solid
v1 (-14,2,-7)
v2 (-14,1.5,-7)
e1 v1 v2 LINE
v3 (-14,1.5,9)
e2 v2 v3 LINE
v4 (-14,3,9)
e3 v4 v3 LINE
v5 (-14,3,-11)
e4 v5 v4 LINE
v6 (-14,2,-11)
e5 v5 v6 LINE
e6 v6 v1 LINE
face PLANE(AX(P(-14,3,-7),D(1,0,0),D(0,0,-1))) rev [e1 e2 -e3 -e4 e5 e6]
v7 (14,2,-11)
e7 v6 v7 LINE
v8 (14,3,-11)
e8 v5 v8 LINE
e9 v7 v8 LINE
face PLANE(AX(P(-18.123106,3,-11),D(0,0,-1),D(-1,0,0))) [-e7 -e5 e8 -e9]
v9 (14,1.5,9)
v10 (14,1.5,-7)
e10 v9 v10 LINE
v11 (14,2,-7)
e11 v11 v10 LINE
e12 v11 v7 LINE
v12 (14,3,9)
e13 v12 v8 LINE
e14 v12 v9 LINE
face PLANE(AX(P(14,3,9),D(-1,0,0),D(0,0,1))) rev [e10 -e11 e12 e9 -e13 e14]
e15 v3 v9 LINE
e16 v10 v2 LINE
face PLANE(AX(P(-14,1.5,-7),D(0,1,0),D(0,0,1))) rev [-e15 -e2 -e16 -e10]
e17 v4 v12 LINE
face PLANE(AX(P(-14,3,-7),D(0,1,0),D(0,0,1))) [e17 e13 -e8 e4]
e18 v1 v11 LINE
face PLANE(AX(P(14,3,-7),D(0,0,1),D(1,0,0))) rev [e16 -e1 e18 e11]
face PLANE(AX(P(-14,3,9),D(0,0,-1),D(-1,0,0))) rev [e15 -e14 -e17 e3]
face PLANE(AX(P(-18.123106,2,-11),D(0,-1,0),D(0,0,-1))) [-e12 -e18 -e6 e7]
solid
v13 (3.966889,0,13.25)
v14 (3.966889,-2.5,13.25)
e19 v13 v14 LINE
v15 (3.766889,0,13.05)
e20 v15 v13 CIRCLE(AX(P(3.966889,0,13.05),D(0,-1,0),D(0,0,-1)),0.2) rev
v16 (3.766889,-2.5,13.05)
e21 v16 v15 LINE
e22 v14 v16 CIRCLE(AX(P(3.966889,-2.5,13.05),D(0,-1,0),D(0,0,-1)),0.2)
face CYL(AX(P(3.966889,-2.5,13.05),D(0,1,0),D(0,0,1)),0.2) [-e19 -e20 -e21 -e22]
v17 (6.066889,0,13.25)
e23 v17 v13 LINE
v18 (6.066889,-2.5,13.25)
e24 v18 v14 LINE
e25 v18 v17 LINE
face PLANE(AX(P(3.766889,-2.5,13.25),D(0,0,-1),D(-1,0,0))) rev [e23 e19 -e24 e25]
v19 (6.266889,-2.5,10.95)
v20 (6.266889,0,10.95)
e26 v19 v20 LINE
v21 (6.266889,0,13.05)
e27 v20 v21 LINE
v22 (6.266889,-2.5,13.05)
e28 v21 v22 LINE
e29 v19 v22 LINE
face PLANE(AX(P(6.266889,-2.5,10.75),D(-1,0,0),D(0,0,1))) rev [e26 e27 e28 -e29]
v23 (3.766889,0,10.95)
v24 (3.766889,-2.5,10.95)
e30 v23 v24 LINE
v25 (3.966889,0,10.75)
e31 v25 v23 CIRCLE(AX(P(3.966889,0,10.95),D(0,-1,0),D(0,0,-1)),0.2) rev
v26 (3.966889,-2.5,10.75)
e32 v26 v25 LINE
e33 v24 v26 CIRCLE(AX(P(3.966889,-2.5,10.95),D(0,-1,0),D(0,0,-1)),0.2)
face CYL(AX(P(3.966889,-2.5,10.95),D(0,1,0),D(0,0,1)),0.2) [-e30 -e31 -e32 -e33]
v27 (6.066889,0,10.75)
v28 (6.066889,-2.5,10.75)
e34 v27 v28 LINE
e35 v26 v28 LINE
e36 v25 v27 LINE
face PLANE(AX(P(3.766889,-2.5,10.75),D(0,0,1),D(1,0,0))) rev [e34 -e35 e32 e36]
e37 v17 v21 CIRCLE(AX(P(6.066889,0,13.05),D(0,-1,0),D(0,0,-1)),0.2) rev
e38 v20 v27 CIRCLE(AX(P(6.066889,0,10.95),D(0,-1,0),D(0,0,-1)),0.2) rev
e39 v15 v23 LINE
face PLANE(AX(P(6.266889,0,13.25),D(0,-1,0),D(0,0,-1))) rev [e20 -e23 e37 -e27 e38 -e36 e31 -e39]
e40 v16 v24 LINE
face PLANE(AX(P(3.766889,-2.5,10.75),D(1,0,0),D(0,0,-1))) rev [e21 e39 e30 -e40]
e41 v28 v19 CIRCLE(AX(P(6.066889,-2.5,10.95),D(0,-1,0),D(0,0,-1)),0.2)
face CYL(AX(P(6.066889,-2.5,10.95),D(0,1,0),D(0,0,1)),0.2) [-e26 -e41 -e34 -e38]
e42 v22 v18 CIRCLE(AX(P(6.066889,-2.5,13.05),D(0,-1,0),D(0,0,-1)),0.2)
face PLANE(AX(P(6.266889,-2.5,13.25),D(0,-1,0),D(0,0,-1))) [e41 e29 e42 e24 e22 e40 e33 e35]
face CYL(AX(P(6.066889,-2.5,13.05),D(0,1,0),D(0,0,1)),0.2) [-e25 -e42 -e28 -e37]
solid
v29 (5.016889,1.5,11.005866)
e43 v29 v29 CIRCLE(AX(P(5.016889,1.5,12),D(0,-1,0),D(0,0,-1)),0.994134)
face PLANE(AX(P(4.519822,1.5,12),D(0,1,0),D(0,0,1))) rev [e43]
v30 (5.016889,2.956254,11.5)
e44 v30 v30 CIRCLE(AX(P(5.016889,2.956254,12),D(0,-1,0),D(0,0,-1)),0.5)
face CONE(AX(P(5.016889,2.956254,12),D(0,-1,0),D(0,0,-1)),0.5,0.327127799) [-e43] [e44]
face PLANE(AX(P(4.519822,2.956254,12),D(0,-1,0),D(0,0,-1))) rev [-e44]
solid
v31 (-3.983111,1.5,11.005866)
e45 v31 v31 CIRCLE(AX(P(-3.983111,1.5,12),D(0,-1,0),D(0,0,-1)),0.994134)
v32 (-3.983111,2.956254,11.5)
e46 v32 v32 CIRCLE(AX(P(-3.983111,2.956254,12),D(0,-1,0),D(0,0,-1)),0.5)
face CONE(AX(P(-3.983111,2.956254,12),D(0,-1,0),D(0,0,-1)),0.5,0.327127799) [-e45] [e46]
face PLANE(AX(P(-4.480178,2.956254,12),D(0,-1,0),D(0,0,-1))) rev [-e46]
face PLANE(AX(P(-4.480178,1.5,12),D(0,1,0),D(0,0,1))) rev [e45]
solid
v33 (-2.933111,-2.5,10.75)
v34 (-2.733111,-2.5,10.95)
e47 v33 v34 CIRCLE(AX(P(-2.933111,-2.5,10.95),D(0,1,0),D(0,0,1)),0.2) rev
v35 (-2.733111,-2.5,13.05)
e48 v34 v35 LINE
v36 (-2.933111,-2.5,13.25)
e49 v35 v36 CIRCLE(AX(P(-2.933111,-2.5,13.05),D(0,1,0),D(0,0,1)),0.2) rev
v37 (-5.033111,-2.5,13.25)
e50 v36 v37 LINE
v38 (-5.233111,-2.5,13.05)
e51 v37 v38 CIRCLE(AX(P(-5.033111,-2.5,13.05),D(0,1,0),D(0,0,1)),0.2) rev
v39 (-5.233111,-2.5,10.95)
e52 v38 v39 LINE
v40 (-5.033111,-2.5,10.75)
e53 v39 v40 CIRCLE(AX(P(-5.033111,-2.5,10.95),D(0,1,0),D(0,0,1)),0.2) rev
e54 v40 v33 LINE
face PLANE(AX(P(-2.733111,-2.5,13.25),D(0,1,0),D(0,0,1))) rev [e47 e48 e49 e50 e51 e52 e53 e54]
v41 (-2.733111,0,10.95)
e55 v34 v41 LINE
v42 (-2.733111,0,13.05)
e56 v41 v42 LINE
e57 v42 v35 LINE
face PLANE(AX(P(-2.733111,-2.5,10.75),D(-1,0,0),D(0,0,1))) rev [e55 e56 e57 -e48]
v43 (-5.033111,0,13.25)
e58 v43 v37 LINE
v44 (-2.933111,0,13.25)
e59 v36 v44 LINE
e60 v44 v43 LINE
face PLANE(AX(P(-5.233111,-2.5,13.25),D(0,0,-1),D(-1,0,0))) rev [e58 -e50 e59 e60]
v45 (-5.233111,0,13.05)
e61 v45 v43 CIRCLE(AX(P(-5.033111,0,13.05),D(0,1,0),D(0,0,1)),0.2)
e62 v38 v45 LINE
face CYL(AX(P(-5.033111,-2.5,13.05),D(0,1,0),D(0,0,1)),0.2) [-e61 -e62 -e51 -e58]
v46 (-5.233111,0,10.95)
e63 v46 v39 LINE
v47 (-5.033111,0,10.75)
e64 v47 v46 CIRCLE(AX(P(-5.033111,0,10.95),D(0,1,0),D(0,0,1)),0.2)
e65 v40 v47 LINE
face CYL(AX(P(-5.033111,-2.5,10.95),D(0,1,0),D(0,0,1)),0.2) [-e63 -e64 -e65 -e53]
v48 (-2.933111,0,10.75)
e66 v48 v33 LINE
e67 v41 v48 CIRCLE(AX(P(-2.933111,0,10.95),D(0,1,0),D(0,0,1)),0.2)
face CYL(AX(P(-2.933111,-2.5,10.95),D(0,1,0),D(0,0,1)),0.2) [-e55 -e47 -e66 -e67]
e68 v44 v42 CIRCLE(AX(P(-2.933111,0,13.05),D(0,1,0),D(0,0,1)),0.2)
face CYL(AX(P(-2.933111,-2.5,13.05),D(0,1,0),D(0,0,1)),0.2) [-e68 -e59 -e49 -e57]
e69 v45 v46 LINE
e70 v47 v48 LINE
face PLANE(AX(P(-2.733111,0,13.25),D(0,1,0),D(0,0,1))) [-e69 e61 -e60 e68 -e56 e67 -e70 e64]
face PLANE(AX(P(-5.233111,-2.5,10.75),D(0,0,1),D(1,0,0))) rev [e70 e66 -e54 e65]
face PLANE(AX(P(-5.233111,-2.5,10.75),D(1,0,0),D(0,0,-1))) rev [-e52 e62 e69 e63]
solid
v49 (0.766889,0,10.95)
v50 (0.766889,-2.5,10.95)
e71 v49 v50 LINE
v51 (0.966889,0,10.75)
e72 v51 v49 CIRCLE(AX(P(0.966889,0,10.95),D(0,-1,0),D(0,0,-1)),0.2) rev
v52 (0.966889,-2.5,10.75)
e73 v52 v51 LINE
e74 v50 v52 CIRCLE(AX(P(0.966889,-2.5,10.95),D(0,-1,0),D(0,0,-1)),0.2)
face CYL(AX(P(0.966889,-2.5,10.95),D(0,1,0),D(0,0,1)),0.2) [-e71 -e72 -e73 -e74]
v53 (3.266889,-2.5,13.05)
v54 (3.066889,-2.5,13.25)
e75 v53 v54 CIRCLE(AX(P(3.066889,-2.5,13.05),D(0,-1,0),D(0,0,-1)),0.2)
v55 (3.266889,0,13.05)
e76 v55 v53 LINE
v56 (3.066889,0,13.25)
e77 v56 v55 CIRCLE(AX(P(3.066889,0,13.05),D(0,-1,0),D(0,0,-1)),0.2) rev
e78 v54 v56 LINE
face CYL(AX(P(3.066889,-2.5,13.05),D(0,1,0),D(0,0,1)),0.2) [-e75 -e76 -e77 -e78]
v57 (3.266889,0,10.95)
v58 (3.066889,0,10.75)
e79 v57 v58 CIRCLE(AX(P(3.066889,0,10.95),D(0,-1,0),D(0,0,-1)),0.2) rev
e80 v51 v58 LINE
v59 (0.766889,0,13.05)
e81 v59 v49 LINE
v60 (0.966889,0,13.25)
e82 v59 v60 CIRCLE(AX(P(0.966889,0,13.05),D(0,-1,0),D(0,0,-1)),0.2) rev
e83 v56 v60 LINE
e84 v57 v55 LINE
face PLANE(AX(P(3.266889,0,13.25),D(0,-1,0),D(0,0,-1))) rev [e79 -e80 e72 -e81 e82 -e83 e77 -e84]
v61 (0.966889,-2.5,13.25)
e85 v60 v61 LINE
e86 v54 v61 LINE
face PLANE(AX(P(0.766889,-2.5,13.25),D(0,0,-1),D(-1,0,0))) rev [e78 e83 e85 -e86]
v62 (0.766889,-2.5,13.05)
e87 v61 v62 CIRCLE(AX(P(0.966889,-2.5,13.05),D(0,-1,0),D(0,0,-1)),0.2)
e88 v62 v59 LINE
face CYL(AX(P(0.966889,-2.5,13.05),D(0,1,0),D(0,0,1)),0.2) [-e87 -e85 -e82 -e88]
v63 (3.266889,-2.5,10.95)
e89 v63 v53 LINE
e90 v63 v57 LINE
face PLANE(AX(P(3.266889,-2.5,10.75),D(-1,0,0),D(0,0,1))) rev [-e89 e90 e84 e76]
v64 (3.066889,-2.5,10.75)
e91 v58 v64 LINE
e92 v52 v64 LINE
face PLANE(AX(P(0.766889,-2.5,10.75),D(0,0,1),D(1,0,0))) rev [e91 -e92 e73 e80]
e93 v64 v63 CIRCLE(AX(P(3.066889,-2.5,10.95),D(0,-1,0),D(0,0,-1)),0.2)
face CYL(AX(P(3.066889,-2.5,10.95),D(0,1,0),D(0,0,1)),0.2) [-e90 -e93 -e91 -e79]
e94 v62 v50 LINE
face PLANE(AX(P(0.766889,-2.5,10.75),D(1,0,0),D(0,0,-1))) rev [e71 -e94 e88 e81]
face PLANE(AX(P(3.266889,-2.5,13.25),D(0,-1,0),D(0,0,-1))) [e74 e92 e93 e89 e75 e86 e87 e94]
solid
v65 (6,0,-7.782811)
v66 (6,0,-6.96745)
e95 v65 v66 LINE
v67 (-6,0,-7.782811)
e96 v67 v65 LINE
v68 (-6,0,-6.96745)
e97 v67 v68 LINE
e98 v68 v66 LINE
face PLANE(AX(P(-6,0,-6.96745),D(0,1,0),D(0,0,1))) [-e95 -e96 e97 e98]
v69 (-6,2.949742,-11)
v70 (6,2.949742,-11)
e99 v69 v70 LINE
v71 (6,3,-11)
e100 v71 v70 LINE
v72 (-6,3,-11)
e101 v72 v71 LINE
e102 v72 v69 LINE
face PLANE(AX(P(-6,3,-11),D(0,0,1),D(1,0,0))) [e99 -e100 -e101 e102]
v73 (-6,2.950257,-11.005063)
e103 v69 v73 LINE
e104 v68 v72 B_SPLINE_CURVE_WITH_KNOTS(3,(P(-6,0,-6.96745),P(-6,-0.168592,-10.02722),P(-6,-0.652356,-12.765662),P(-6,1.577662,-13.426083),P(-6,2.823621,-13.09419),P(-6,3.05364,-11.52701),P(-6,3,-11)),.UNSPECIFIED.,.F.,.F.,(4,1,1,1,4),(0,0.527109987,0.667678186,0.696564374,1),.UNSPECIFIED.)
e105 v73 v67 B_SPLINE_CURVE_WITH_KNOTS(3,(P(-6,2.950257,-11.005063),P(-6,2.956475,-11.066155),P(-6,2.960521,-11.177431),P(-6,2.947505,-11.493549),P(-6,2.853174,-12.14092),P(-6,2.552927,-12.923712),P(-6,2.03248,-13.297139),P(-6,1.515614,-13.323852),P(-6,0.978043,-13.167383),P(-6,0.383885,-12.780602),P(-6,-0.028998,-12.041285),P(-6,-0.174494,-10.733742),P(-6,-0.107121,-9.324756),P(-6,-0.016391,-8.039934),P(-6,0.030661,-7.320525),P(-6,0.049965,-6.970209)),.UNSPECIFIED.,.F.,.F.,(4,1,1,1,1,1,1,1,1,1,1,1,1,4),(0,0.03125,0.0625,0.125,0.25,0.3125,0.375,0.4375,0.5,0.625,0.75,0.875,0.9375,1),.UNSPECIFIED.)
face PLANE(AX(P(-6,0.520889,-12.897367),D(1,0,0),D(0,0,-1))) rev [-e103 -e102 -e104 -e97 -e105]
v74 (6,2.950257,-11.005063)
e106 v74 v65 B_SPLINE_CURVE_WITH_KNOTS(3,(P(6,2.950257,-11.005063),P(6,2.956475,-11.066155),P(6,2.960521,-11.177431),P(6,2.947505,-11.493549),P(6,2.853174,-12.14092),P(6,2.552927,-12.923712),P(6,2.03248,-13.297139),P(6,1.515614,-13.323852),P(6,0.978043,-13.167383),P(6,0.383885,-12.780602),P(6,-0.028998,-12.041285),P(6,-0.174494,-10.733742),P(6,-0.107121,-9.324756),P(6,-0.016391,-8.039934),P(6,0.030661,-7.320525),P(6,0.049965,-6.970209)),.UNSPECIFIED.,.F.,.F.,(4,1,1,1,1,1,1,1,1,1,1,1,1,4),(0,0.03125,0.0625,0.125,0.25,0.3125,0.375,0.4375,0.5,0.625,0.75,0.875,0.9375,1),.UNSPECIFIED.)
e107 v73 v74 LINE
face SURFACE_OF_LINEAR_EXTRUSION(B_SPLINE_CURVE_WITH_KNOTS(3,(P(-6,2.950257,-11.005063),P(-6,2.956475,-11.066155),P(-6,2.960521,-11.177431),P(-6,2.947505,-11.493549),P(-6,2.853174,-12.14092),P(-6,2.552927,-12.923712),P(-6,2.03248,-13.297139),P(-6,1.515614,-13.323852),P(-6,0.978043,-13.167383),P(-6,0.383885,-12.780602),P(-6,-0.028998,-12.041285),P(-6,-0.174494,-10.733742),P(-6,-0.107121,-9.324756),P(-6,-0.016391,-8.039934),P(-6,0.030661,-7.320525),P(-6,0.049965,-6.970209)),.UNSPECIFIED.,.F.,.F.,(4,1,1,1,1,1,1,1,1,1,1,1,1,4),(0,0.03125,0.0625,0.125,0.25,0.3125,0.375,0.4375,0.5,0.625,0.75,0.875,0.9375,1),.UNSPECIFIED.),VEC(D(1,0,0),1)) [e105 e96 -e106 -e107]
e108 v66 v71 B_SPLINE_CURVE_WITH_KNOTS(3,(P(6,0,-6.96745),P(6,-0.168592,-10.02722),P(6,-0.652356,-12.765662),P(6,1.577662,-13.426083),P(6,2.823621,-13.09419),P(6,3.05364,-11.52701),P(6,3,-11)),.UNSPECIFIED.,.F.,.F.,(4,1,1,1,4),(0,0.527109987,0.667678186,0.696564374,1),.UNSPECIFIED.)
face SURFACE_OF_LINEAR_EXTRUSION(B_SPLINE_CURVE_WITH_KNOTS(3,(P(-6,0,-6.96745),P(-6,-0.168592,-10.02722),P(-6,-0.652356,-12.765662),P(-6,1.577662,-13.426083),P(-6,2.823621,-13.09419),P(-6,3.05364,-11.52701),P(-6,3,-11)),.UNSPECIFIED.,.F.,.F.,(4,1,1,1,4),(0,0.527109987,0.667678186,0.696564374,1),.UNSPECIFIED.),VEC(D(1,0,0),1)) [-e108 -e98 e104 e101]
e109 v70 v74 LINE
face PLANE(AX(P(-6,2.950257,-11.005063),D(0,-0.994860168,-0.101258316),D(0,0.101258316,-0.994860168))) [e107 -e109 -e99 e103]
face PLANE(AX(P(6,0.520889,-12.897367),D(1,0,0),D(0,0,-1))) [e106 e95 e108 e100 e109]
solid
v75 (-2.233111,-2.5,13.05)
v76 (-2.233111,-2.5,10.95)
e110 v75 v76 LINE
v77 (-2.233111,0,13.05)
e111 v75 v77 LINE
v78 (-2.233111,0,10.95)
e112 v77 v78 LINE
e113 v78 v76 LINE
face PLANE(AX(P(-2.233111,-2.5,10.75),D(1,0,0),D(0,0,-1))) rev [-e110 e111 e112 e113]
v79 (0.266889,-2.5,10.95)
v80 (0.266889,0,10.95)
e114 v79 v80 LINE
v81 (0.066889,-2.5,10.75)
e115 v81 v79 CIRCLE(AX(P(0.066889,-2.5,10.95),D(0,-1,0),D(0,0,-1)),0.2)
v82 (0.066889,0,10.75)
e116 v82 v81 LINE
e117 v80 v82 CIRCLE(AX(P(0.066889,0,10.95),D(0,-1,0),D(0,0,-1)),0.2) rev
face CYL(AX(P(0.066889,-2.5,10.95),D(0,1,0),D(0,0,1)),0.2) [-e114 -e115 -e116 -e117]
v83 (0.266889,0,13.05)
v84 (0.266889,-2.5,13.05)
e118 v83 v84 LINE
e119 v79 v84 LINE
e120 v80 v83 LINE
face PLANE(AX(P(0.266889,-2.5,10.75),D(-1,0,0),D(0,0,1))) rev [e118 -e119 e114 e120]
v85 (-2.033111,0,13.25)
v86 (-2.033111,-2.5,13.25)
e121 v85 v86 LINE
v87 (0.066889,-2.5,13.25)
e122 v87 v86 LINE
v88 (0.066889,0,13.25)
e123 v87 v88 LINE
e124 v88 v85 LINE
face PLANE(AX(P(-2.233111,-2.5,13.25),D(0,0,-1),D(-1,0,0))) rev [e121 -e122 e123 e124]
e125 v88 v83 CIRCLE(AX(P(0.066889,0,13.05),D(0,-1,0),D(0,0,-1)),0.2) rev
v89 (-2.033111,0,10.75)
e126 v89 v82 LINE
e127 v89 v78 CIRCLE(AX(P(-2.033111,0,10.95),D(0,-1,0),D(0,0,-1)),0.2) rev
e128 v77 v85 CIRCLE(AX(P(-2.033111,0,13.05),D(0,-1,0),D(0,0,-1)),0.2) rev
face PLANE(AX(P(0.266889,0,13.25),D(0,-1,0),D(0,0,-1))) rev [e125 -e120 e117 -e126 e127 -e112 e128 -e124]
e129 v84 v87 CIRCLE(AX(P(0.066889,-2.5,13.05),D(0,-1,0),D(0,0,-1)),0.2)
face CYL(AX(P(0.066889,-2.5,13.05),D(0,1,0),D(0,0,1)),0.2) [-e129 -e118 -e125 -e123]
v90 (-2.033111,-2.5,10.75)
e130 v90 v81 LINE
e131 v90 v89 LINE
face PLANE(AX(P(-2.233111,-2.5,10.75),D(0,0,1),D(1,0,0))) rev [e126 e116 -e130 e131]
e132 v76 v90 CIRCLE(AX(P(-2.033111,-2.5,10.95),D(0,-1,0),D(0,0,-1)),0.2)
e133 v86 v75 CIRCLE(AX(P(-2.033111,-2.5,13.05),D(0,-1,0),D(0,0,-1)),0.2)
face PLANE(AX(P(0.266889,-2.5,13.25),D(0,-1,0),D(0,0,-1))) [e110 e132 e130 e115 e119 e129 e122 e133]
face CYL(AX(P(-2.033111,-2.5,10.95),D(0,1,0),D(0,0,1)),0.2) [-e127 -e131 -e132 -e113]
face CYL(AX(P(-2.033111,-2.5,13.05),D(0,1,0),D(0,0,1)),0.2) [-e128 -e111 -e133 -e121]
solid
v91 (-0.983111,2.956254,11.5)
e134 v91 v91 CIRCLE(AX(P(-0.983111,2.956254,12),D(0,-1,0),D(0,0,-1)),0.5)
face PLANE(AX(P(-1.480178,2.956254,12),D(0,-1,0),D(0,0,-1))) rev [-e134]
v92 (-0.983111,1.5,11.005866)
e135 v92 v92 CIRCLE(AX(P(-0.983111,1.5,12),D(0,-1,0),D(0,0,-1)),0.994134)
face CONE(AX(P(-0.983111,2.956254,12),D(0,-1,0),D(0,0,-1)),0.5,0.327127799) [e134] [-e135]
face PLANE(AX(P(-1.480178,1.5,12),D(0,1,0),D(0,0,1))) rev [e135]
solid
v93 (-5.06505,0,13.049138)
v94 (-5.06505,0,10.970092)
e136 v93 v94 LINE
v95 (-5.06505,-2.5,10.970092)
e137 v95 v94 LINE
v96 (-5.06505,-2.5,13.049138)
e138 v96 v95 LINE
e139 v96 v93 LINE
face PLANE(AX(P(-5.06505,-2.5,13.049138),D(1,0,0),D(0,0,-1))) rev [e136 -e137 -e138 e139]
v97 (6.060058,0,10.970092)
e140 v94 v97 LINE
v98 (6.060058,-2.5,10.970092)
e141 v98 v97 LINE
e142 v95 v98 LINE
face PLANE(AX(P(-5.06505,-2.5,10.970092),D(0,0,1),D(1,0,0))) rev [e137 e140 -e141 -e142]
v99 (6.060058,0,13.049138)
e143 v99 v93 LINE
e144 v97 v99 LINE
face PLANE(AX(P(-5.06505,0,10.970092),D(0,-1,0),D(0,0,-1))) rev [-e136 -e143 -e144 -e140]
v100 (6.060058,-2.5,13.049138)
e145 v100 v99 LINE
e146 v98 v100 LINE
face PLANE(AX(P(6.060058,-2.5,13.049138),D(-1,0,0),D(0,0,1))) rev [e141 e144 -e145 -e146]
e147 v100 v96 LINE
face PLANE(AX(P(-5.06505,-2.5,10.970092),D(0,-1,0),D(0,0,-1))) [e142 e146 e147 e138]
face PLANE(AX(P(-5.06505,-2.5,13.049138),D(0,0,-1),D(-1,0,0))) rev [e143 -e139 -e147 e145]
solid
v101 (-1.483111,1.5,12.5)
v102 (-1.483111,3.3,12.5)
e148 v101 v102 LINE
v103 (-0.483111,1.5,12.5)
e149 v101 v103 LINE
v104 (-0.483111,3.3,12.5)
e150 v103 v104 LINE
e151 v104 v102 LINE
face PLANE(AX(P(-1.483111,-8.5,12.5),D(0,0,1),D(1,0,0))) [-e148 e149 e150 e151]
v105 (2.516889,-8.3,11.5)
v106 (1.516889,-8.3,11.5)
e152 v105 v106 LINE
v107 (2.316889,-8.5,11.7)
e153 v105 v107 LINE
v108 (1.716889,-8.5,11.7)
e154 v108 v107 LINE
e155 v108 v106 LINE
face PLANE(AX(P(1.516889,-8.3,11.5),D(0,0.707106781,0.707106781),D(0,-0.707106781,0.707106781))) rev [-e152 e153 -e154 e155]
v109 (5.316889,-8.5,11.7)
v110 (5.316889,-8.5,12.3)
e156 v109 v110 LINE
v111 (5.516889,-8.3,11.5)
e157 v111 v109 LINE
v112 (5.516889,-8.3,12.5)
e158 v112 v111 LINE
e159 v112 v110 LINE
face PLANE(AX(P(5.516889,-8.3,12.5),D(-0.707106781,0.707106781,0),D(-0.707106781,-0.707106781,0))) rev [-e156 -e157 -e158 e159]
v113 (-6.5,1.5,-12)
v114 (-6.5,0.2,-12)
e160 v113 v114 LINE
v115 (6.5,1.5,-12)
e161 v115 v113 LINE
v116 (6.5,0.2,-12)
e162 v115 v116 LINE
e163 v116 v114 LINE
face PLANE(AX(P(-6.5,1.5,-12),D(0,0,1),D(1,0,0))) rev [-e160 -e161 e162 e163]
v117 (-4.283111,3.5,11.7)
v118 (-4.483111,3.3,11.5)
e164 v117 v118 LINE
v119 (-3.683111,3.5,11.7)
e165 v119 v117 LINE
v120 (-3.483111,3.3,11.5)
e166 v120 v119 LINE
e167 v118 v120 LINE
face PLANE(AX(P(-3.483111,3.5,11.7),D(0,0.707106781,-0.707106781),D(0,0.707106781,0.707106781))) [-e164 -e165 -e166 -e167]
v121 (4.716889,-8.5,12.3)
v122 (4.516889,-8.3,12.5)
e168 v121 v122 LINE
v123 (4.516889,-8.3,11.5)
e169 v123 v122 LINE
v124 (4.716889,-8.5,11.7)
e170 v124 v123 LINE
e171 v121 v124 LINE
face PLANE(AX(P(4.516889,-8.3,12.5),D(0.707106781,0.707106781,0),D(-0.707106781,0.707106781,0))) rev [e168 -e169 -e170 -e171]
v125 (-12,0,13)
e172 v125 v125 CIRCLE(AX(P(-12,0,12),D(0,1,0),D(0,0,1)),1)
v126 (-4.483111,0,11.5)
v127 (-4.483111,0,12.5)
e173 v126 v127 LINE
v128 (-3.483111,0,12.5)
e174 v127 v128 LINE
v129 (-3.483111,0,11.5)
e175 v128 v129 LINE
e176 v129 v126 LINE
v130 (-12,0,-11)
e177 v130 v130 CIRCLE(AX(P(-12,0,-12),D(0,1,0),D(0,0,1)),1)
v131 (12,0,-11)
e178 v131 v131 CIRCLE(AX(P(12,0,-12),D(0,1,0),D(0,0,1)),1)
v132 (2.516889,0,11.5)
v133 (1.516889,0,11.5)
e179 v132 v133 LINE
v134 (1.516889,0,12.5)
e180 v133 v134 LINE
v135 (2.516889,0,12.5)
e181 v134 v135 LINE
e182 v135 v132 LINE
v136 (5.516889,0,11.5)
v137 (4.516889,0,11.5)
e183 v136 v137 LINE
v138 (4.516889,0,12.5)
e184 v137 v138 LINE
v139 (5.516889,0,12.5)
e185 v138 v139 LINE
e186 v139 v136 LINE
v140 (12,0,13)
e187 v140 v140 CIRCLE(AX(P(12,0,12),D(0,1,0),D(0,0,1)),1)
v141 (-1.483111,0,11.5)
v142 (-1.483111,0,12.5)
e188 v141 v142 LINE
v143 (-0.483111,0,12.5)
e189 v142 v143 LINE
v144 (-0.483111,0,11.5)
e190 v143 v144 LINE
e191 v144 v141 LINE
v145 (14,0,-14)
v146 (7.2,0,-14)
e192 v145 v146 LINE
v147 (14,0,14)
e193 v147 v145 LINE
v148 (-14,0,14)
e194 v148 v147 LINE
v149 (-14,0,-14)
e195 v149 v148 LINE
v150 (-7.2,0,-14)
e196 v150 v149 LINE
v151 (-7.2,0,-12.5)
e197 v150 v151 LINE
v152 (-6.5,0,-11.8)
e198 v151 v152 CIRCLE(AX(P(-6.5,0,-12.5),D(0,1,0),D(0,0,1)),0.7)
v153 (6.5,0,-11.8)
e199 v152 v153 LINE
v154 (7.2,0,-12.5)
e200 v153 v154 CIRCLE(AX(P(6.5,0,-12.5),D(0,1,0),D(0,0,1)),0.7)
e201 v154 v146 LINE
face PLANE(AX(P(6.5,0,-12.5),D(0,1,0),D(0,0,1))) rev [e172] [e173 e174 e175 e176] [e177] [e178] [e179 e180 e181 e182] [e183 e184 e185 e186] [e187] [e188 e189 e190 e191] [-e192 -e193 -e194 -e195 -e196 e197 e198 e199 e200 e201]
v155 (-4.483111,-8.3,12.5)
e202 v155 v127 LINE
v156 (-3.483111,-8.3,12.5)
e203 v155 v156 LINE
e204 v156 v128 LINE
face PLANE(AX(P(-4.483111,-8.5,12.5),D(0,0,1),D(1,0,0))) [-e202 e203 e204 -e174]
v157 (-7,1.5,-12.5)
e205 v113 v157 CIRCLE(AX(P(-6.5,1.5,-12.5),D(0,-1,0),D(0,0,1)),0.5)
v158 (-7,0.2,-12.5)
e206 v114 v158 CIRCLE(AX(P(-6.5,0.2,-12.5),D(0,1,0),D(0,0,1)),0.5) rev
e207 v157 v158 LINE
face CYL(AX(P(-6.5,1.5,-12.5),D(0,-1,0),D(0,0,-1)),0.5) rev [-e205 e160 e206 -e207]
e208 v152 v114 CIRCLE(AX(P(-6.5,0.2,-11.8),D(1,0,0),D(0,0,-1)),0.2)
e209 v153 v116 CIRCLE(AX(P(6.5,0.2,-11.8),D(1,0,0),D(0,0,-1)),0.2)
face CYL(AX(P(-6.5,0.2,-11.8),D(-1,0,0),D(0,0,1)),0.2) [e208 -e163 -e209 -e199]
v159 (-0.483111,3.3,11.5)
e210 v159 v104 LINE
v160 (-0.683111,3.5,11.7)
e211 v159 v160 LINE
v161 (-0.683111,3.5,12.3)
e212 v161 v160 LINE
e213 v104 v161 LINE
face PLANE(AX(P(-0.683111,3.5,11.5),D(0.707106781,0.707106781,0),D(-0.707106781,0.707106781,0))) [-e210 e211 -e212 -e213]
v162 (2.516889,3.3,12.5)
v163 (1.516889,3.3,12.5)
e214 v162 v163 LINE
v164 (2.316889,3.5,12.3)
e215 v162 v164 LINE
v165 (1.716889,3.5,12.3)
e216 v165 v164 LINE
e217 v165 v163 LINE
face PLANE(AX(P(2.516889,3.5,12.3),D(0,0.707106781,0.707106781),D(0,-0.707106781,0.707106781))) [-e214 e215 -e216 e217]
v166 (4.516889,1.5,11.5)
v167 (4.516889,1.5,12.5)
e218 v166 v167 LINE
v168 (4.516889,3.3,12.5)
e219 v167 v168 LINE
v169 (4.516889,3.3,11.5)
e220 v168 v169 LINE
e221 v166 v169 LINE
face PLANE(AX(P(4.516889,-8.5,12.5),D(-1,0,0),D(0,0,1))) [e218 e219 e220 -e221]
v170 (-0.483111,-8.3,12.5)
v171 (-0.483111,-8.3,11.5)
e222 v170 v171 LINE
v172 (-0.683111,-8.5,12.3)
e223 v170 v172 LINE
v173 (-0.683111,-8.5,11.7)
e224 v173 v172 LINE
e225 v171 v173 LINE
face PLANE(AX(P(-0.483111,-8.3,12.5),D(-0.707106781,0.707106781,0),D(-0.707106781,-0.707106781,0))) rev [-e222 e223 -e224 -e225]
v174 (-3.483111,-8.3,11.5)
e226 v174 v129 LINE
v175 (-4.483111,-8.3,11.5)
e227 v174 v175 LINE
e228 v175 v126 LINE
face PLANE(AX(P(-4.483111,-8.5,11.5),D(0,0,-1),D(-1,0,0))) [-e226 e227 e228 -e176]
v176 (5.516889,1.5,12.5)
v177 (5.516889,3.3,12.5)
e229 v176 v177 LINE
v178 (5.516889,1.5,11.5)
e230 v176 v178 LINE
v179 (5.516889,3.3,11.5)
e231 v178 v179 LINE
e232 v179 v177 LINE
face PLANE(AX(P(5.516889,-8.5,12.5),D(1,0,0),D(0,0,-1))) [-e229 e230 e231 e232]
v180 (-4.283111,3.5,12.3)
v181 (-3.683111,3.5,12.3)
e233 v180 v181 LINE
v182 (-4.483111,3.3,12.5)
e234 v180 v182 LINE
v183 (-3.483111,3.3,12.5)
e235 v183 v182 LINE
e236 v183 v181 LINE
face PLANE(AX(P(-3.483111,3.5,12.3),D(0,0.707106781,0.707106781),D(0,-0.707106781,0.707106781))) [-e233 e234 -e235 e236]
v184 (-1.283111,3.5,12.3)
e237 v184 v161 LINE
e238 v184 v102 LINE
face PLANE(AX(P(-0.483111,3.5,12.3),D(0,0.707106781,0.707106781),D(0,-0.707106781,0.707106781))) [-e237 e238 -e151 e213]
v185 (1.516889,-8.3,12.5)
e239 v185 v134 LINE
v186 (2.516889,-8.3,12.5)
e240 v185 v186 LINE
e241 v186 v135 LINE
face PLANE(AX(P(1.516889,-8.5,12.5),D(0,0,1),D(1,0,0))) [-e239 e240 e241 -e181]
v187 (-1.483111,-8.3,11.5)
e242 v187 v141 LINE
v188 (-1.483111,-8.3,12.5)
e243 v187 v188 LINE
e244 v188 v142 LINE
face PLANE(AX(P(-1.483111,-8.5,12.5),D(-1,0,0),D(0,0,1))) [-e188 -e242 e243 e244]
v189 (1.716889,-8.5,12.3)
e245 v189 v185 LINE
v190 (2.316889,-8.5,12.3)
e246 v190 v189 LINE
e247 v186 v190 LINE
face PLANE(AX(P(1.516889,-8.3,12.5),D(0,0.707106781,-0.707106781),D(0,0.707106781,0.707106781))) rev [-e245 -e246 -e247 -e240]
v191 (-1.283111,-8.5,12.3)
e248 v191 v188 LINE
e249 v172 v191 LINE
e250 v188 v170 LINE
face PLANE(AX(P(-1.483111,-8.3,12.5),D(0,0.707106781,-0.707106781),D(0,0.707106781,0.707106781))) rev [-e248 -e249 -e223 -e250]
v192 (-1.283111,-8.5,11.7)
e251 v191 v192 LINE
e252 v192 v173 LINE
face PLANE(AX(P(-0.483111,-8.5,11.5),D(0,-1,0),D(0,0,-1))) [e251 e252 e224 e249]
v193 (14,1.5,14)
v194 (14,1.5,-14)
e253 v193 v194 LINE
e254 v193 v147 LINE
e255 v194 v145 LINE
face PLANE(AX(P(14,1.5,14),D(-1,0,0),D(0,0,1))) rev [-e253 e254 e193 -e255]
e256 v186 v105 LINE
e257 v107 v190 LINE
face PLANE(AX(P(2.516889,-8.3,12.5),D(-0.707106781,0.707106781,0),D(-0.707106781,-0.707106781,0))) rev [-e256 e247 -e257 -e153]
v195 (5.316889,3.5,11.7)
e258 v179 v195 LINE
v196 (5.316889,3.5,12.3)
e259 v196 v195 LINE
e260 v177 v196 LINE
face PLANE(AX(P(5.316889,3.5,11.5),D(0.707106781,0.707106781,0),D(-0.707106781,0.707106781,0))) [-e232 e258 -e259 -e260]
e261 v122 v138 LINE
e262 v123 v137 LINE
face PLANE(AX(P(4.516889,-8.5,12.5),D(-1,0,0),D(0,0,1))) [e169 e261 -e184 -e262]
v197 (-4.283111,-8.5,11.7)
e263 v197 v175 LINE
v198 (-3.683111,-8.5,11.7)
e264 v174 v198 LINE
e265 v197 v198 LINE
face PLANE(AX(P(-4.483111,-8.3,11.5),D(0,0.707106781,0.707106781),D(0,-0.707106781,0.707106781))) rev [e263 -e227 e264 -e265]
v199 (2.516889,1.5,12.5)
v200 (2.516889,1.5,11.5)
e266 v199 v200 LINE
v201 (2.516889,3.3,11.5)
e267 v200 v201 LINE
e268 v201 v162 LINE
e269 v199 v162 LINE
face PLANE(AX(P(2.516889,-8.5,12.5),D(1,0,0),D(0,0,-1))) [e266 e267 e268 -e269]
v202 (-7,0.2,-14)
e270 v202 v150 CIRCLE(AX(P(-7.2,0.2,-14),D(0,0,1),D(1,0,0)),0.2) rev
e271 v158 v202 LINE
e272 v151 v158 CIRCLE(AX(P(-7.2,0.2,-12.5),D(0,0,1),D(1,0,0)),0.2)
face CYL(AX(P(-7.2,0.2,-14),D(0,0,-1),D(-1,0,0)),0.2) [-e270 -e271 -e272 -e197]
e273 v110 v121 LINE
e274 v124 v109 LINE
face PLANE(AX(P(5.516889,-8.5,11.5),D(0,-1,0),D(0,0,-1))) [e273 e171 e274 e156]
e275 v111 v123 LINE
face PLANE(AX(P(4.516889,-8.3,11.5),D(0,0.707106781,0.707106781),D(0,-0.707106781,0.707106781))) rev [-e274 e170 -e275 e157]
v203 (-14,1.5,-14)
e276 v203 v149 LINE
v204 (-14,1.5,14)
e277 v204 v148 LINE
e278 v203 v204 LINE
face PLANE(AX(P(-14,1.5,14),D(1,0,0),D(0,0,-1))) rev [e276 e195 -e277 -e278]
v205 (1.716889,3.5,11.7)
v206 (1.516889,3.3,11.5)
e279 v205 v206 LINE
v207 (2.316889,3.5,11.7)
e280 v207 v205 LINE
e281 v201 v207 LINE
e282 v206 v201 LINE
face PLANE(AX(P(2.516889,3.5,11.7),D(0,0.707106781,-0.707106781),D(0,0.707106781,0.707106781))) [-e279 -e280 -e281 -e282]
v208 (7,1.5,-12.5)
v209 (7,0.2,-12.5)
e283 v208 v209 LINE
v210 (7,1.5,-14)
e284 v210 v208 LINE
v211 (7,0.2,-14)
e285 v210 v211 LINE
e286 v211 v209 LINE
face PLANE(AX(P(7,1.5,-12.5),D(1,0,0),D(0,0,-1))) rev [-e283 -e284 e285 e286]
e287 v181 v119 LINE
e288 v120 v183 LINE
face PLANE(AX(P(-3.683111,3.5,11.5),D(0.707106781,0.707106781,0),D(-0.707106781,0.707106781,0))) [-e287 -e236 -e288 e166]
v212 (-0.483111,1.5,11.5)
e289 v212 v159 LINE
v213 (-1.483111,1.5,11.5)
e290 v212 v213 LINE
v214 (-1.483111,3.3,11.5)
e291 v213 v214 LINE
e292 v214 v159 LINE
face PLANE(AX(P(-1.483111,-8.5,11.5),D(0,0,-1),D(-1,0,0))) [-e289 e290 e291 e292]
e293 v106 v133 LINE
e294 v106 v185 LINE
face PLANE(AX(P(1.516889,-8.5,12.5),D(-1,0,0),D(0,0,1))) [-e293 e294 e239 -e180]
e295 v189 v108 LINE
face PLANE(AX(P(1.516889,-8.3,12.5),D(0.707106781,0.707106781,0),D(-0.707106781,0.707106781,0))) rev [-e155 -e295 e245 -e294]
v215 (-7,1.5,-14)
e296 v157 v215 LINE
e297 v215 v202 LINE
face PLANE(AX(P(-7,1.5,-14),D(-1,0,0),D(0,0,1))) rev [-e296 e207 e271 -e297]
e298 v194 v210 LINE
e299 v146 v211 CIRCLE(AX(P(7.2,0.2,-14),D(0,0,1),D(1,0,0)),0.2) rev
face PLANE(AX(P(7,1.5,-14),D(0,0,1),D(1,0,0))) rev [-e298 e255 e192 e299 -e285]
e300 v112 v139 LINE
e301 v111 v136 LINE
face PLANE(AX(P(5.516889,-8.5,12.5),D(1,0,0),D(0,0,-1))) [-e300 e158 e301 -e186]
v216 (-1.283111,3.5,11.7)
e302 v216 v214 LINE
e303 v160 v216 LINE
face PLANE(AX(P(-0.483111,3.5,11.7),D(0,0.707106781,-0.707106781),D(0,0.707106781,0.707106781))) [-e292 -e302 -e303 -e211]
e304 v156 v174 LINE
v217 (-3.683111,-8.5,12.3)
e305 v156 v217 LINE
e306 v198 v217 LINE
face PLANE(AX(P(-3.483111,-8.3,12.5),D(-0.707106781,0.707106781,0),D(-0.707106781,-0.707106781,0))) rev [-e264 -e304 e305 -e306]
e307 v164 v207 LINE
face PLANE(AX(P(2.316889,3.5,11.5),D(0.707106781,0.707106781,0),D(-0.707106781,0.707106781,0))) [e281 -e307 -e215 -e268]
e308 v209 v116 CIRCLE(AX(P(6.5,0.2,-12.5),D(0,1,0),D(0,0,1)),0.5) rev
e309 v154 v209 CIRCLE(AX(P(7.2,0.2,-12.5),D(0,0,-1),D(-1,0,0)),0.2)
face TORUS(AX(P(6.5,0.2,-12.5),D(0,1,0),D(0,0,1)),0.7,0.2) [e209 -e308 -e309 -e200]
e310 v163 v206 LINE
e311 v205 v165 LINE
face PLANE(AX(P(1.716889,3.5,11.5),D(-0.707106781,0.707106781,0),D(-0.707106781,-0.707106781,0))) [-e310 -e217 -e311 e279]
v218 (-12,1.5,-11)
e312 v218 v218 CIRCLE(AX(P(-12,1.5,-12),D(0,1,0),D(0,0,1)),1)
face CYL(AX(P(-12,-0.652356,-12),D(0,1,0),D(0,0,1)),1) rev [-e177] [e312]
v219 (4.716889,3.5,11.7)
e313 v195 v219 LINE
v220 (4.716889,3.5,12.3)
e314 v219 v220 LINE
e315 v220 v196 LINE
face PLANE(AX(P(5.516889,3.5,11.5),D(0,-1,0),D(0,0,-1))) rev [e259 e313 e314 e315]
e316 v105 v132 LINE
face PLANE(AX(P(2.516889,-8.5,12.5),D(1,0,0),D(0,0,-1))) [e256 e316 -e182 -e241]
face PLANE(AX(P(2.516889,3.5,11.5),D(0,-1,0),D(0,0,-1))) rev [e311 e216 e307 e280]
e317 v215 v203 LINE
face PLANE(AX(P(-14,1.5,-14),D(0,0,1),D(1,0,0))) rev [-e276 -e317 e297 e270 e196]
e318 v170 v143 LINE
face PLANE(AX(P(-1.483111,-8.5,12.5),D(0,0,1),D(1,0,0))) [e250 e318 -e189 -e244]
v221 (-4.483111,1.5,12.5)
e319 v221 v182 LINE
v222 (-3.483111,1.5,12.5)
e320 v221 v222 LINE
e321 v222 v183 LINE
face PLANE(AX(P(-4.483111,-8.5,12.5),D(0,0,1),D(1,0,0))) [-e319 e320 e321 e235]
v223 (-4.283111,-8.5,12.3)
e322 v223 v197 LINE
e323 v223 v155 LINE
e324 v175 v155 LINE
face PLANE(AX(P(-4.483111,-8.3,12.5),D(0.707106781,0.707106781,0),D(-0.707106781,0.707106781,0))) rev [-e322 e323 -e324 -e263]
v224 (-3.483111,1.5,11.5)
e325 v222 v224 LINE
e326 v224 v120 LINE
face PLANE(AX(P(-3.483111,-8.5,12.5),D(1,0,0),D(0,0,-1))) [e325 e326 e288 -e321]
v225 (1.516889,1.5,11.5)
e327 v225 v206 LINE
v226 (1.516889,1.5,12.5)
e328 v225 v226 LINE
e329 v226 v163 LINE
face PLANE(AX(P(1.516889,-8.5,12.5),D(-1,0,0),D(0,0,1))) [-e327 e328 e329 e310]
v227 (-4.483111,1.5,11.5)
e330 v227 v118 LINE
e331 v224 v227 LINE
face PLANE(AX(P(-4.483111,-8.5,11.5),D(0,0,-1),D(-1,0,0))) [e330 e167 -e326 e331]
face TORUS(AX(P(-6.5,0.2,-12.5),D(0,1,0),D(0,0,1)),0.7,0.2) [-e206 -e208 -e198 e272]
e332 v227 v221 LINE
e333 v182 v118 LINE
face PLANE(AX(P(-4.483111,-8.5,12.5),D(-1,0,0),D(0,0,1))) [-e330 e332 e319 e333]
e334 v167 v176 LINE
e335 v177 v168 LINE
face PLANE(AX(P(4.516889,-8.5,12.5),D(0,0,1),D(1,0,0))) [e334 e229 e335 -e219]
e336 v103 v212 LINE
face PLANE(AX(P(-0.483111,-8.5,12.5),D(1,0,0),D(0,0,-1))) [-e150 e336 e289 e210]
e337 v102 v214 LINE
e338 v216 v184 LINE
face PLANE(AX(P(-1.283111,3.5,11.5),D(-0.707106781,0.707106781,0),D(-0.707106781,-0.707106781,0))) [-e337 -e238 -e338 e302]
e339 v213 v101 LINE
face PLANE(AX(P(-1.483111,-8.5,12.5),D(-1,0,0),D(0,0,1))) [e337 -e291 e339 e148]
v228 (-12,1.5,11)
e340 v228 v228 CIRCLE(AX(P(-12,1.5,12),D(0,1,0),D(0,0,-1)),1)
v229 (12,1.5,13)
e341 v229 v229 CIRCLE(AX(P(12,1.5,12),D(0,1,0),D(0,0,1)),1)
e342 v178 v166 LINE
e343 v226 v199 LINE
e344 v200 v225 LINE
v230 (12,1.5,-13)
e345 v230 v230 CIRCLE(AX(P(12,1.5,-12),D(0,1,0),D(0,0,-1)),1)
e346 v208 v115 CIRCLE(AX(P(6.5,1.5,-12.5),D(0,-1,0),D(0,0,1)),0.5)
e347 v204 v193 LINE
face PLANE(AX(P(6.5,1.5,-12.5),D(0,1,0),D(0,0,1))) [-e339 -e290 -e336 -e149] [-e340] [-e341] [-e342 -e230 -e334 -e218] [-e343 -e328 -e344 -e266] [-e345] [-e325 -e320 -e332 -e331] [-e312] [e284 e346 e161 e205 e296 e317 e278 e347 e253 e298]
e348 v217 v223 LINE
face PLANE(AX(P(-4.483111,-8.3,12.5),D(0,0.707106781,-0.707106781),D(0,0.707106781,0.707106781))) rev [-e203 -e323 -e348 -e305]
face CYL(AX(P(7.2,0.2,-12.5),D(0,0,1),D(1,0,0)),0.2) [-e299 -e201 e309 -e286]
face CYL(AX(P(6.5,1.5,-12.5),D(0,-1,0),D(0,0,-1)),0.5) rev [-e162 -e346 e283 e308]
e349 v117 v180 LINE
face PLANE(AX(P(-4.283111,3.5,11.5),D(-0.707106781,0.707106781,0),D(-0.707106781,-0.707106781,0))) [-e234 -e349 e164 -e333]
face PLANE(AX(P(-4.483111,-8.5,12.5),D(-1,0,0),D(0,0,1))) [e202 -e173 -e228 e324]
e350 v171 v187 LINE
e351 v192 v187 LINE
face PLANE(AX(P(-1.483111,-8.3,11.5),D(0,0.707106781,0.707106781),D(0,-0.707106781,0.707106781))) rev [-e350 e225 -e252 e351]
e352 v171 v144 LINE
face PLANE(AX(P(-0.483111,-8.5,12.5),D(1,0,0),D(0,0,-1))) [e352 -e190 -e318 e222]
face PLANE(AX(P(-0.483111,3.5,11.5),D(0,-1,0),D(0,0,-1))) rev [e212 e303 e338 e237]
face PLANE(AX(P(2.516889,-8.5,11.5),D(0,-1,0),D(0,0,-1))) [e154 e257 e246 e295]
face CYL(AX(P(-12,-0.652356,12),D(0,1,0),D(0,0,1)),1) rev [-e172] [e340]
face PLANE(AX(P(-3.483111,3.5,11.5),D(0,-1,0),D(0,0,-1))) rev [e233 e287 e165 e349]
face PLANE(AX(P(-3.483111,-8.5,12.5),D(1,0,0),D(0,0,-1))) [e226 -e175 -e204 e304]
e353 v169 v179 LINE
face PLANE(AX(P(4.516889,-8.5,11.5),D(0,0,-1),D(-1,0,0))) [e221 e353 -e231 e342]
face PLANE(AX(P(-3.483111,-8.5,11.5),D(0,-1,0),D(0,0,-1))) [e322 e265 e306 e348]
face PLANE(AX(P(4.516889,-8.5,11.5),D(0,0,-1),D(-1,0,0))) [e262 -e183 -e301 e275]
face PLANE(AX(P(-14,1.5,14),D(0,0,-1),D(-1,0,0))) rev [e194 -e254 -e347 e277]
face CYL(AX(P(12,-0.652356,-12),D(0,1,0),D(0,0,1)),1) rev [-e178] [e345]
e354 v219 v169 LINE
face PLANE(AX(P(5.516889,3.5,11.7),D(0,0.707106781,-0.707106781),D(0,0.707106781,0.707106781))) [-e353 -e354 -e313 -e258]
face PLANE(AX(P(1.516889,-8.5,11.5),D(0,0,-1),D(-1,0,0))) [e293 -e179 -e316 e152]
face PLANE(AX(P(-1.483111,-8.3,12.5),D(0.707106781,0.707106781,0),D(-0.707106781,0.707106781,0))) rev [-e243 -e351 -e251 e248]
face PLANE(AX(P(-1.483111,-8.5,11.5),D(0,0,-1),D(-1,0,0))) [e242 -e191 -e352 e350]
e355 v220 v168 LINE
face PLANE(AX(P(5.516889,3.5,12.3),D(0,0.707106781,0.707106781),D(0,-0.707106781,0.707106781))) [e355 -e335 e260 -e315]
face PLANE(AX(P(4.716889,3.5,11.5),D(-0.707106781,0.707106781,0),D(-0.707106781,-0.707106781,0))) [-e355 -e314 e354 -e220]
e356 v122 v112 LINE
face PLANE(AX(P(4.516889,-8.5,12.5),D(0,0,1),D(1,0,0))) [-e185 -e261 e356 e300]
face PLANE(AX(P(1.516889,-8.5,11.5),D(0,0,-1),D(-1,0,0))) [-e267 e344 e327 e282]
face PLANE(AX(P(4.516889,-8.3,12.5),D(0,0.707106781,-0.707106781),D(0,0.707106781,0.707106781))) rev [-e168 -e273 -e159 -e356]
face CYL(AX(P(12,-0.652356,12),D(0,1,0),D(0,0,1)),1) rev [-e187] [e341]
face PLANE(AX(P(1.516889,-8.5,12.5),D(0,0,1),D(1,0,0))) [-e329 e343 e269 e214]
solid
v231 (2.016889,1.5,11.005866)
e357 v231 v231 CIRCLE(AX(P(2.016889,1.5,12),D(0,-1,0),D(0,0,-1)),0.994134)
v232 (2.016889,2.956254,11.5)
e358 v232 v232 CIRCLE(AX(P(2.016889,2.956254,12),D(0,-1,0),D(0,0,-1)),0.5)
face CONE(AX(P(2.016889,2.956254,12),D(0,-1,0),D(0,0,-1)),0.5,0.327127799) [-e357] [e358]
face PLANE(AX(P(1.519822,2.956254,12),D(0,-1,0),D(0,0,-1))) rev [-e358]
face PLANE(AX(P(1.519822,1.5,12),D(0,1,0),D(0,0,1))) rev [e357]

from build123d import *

# Parameters (mm, degrees)
BOSS_EXTRUDE1_DEPTH      = 1.5
SKETCH2_W                = 28
SKETCH2_H                = 16
BOSS_EXTRUDE2_DEPTH      = 1.5
SKETCH3_W                = 4
SKETCH3_H                = 1
BOSS_EXTRUDE3_DEPTH      = 28
BOSS_EXTRUDE4_START      = -20
BOSS_EXTRUDE4_DEPTH      = 12
FILLET1_R                = 0.2
SKETCH5_R                = 1
CUT_EXTRUDE1_DEPTH       = 20.870909964
BOSS_EXTRUDE5_DEPTH      = 2
BOSS_EXTRUDE5_DEPTH_BACK = 10
SKETCH6_W                = 1
SKETCH6_H                = 1
SKETCH7_W                = 2.5
SKETCH7_H                = 2.5
BOSS_EXTRUDE6_DEPTH      = 2.5
BOSS_EXTRUDE6_2_DEPTH    = 2.5
BOSS_EXTRUDE6_3_DEPTH    = 2.5
BOSS_EXTRUDE6_4_DEPTH    = 2.5
SKETCH8_W                = 11.125107546
SKETCH8_H                = 2.079045943
BOSS_EXTRUDE7_DEPTH      = 2.5
FILLET2_R                = 0.2
FILLET3_R                = 0.2
FILLET4_R                = 0.2
FILLET5_R                = 0.2
CHAMFER1_SIZE            = 0.2
LPATTERN2_COUNT          = 4
LPATTERN2_PITCH          = 3


# Read off the part's stored shape, not the designer's step: Boss-Extrude4
with BuildPart() as part:
    # Sketch1 → Boss-Extrude1 (new body)
    with BuildSketch(Plane(origin=(0, 0, 0), x_dir=(1, 0, 0), z_dir=(0, 1, 0))):
        with BuildLine():
            Line((7, 14), (14, 14))
            Line((14, 14), (14, -14))
            Line((14, -14), (-14, -14))
            Line((-14, -14), (-14, 14))
            Line((-14, 14), (-7, 14))
            Line((-7, 14), (-7, 12.5))
            ThreePointArc((-7, 12.5), (-6.853553391, 12.146446609), (-6.5, 12))
            Line((-6.5, 12), (6.5, 12))
            ThreePointArc((6.5, 12), (6.853553391, 12.146446609), (7, 12.5))
            Line((7, 12.5), (7, 14))
        make_face()
    extrude(amount=BOSS_EXTRUDE1_DEPTH)

    # Fillet1
    fillet1_edges = [part.edges().sort_by_distance(p)[0] for p in [
        (-7, 0, -13.25),
        (-6.853553391, 0, -12.146446609),
        (0, 0, -12),
        (6.853553391, 0, -12.146446609),
        (7, 0, -13.25),
    ]]
    fillet(fillet1_edges, radius=FILLET1_R)

    # Sketch5 → Cut-Extrude1 (cut, through all)
    with BuildSketch(Plane(origin=(0, 1.5, 0), x_dir=(1, 0, 0), z_dir=(0, 1, 0))):
        with Locations(Location((-12, 12, 0), (0, 0, 270))):
            Circle(SKETCH5_R)
        with Locations(Location((-12, -12, 0), (0, 0, 270))):
            Circle(SKETCH5_R)
        with Locations(Location((12, -12, 0), (0, 0, 270))):
            Circle(SKETCH5_R)
        with Locations(Location((12, 12, 0), (0, 0, 270))):
            Circle(SKETCH5_R)
    extrude(amount=-CUT_EXTRUDE1_DEPTH, mode=Mode.SUBTRACT)

    # Sketch6 → Boss-Extrude5 (add, two sides: drawn at the far end of the back side and taken through both)
    with BuildSketch(Plane(origin=(0, 1.5, 0), x_dir=(1, 0, 0), z_dir=(0, 1, 0)).offset(-BOSS_EXTRUDE5_DEPTH_BACK)):
        with Locations((-3.983110737, -12)):
            Rectangle(SKETCH6_W, SKETCH6_H)
        with Locations((2.016889263, -12)):
            Rectangle(SKETCH6_W, SKETCH6_H)
        with Locations((-0.983110737, -12)):
            Rectangle(SKETCH6_W, SKETCH6_H)
        with Locations((5.016889263, -12)):
            Rectangle(SKETCH6_W, SKETCH6_H)
    extrude(amount=BOSS_EXTRUDE5_DEPTH + BOSS_EXTRUDE5_DEPTH_BACK)

    # Chamfer1
    chamfer1_edges = [part.edges().sort_by_distance(p)[0] for p in [
        (-3.483110737, -8.5, 12),
        (-3.983110737, -8.5, 12.5),
        (-4.483110737, -8.5, 12),
        (-3.983110737, -8.5, 11.5),
        (-3.483110737, 3.5, 12),
        (-3.983110737, 3.5, 11.5),
        (-4.483110737, 3.5, 12),
        (-3.983110737, 3.5, 12.5),
        (2.516889263, -8.5, 12),
        (2.016889263, -8.5, 12.5),
        (1.516889263, -8.5, 12),
        (2.016889263, -8.5, 11.5),
        (2.516889263, 3.5, 12),
        (2.016889263, 3.5, 11.5),
        (1.516889263, 3.5, 12),
        (2.016889263, 3.5, 12.5),
        (-0.483110737, -8.5, 12),
        (-0.983110737, -8.5, 12.5),
        (-1.483110737, -8.5, 12),
        (-0.983110737, -8.5, 11.5),
        (-0.483110737, 3.5, 12),
        (-0.983110737, 3.5, 11.5),
        (-1.483110737, 3.5, 12),
        (-0.983110737, 3.5, 12.5),
        (5.516889263, -8.5, 12),
        (5.016889263, -8.5, 12.5),
        (4.516889263, -8.5, 12),
        (5.016889263, -8.5, 11.5),
        (5.516889263, 3.5, 12),
        (5.016889263, 3.5, 11.5),
        (4.516889263, 3.5, 12),
        (5.016889263, 3.5, 12.5),
    ]]
    chamfer(chamfer1_edges, length=CHAMFER1_SIZE)


with BuildPart() as body_2:
    # Sketch2 → Boss-Extrude2 (new body)
    with BuildSketch(Plane(origin=(0, 1.5, 0), x_dir=(1, 0, 0), z_dir=(0, 1, 0))):
        with Locations((0, -1)):
            Rectangle(SKETCH2_W, SKETCH2_H)
    extrude(amount=BOSS_EXTRUDE2_DEPTH)

    # Sketch3 → Boss-Extrude3 (add)
    with BuildSketch(Plane(origin=(14, 0, 0), x_dir=(0, 0, -1), z_dir=(1, 0, 0))):
        with Locations((9, 2.5)):
            Rectangle(SKETCH3_W, SKETCH3_H)
    extrude(amount=-BOSS_EXTRUDE3_DEPTH)


with BuildPart() as body_3:
    # Boss-Extrude4 outline → Boss-Extrude4 (new body)
    with BuildSketch(Plane(origin=(14, 0, 0), x_dir=(0, 0, -1), z_dir=(1, 0, 0)).offset(BOSS_EXTRUDE4_START)):
        with BuildLine():
            Line((7.782810555, 0), (6.96745037, 0))
            add(Edge.make_bspline(
                [(6.96745037, 0), (10.027220275, -0.168592487), (12.765662174, -0.652356136), (13.426083061, 1.577662291), (13.094189578, 2.823620969), (11.527009619, 3.053639806), (11, 3)],
                knots=[0, 0, 0, 0, 0.527109987, 0.667678186, 0.696564374, 1, 1, 1, 1], degree=3))
            Line((11, 3), (11, 2.949741681))
            Line((11, 2.949741681), (11.005062916, 2.950256992))
            add(Edge.make_bspline(
                [(11.005062916, 2.950256992), (11.066154519, 2.956474628), (11.177431016, 2.960521447), (11.493548582, 2.947505277), (12.140919996, 2.853174383), (12.923712315, 2.552926664), (13.297139454, 2.032480033), (13.323852266, 1.515614146), (13.167383332, 0.978042512), (12.780601701, 0.383885277), (12.041284832, -0.028997975), (10.733742207, -0.174494427), (9.324755615, -0.107120618), (8.287184135, -0.033850606), (7.862889273, -0.005307576), (7.782810555, 0)],
                knots=[0, 0, 0, 0, 0.03125, 0.0625, 0.125, 0.25, 0.3125, 0.375, 0.4375, 0.5, 0.625, 0.75, 0.875, 0.9375, 0.951890183, 0.951890183, 0.951890183, 0.951890183], degree=3))
        make_face()
    extrude(amount=BOSS_EXTRUDE4_DEPTH)


with BuildPart() as body_4:
    # Sketch7 → Boss-Extrude6 (new body)
    with BuildSketch(Plane.XZ):
        with Locations((-0.983110737, 12)):
            Rectangle(SKETCH7_W, SKETCH7_H)
    extrude(amount=BOSS_EXTRUDE6_DEPTH)

    # Fillet3
    fillet3_edges = [body_4.edges().sort_by_distance(p)[0] for p in [
        (0.266889263, -1.25, 13.25),
        (0.266889263, -1.25, 10.75),
        (-2.233110737, -1.25, 10.75),
        (-2.233110737, -1.25, 13.25),
    ]]
    fillet(fillet3_edges, radius=FILLET3_R)


with BuildPart() as body_5:
    # Sketch7 → Boss-Extrude6 2 (new body)
    with BuildSketch(Plane.XZ):
        with Locations((-3.983110737, 12)):
            Rectangle(SKETCH7_W, SKETCH7_H)
    extrude(amount=BOSS_EXTRUDE6_2_DEPTH)

    # Fillet2
    fillet2_edges = [body_5.edges().sort_by_distance(p)[0] for p in [
        (-2.733110737, -1.25, 10.75),
        (-5.233110737, -1.25, 10.75),
        (-5.233110737, -1.25, 13.25),
        (-2.733110737, -1.25, 13.25),
    ]]
    fillet(fillet2_edges, radius=FILLET2_R)


with BuildPart() as body_6:
    # Sketch7 → Boss-Extrude6 3 (new body)
    with BuildSketch(Plane.XZ):
        with Locations((2.016889263, 12)):
            Rectangle(SKETCH7_W, SKETCH7_H)
    extrude(amount=BOSS_EXTRUDE6_3_DEPTH)

    # Fillet4
    fillet4_edges = [body_6.edges().sort_by_distance(p)[0] for p in [
        (3.266889263, -1.25, 13.25),
        (3.266889263, -1.25, 10.75),
        (0.766889263, -1.25, 10.75),
        (0.766889263, -1.25, 13.25),
    ]]
    fillet(fillet4_edges, radius=FILLET4_R)


with BuildPart() as body_7:
    # Sketch7 → Boss-Extrude6 4 (new body)
    with BuildSketch(Plane.XZ):
        with Locations((5.016889263, 12)):
            Rectangle(SKETCH7_W, SKETCH7_H)
    extrude(amount=BOSS_EXTRUDE6_4_DEPTH)

    # Fillet5
    fillet5_edges = [body_7.edges().sort_by_distance(p)[0] for p in [
        (6.266889263, -1.25, 13.25),
        (6.266889263, -1.25, 10.75),
        (3.766889263, -1.25, 10.75),
        (3.766889263, -1.25, 13.25),
    ]]
    fillet(fillet5_edges, radius=FILLET5_R)


with BuildPart() as body_8:
    # Sketch8 → Boss-Extrude7 (new body)
    with BuildSketch(Plane.XZ):
        with Locations((0.497503755, 12.009615154)):
            Rectangle(SKETCH8_W, SKETCH8_H)
    extrude(amount=BOSS_EXTRUDE7_DEPTH)


with BuildPart() as body_9:
    # Sketch11 → Revolve3 (revolve)
    with BuildSketch(Plane.XY.offset(12), mode=Mode.PRIVATE) as revolve3_sk:
        Polygon((-4.483110737, 2.956254209), (-4.97724522, 1.5), (-3.983110737, 1.5), (-3.983110737, 2.956254209), align=None)
    revolve(revolve3_sk.sketch.rotate(Axis((-3.983110737, 1.5, 12), (0, 1, 0)), 270), axis=Axis((-3.983110737, 1.5, 12), (0, 1, 0)))


with BuildPart() as lpattern2_1:
    # LPattern2: pattern copy
    add(body_9.part.moved(Location(Vector(1, 0, 0) * (1 * LPATTERN2_PITCH))))


with BuildPart() as lpattern2_2:
    # LPattern2: pattern copy
    add(body_9.part.moved(Location(Vector(1, 0, 0) * (2 * LPATTERN2_PITCH))))


with BuildPart() as lpattern2_3:
    # LPattern2: pattern copy
    add(body_9.part.moved(Location(Vector(1, 0, 0) * (3 * LPATTERN2_PITCH))))


solid = Compound([part.part, body_2.part, body_3.part, body_4.part, body_5.part, body_6.part, body_7.part, body_8.part, body_9.part, lpattern2_1.part, lpattern2_2.part, lpattern2_3.part])
